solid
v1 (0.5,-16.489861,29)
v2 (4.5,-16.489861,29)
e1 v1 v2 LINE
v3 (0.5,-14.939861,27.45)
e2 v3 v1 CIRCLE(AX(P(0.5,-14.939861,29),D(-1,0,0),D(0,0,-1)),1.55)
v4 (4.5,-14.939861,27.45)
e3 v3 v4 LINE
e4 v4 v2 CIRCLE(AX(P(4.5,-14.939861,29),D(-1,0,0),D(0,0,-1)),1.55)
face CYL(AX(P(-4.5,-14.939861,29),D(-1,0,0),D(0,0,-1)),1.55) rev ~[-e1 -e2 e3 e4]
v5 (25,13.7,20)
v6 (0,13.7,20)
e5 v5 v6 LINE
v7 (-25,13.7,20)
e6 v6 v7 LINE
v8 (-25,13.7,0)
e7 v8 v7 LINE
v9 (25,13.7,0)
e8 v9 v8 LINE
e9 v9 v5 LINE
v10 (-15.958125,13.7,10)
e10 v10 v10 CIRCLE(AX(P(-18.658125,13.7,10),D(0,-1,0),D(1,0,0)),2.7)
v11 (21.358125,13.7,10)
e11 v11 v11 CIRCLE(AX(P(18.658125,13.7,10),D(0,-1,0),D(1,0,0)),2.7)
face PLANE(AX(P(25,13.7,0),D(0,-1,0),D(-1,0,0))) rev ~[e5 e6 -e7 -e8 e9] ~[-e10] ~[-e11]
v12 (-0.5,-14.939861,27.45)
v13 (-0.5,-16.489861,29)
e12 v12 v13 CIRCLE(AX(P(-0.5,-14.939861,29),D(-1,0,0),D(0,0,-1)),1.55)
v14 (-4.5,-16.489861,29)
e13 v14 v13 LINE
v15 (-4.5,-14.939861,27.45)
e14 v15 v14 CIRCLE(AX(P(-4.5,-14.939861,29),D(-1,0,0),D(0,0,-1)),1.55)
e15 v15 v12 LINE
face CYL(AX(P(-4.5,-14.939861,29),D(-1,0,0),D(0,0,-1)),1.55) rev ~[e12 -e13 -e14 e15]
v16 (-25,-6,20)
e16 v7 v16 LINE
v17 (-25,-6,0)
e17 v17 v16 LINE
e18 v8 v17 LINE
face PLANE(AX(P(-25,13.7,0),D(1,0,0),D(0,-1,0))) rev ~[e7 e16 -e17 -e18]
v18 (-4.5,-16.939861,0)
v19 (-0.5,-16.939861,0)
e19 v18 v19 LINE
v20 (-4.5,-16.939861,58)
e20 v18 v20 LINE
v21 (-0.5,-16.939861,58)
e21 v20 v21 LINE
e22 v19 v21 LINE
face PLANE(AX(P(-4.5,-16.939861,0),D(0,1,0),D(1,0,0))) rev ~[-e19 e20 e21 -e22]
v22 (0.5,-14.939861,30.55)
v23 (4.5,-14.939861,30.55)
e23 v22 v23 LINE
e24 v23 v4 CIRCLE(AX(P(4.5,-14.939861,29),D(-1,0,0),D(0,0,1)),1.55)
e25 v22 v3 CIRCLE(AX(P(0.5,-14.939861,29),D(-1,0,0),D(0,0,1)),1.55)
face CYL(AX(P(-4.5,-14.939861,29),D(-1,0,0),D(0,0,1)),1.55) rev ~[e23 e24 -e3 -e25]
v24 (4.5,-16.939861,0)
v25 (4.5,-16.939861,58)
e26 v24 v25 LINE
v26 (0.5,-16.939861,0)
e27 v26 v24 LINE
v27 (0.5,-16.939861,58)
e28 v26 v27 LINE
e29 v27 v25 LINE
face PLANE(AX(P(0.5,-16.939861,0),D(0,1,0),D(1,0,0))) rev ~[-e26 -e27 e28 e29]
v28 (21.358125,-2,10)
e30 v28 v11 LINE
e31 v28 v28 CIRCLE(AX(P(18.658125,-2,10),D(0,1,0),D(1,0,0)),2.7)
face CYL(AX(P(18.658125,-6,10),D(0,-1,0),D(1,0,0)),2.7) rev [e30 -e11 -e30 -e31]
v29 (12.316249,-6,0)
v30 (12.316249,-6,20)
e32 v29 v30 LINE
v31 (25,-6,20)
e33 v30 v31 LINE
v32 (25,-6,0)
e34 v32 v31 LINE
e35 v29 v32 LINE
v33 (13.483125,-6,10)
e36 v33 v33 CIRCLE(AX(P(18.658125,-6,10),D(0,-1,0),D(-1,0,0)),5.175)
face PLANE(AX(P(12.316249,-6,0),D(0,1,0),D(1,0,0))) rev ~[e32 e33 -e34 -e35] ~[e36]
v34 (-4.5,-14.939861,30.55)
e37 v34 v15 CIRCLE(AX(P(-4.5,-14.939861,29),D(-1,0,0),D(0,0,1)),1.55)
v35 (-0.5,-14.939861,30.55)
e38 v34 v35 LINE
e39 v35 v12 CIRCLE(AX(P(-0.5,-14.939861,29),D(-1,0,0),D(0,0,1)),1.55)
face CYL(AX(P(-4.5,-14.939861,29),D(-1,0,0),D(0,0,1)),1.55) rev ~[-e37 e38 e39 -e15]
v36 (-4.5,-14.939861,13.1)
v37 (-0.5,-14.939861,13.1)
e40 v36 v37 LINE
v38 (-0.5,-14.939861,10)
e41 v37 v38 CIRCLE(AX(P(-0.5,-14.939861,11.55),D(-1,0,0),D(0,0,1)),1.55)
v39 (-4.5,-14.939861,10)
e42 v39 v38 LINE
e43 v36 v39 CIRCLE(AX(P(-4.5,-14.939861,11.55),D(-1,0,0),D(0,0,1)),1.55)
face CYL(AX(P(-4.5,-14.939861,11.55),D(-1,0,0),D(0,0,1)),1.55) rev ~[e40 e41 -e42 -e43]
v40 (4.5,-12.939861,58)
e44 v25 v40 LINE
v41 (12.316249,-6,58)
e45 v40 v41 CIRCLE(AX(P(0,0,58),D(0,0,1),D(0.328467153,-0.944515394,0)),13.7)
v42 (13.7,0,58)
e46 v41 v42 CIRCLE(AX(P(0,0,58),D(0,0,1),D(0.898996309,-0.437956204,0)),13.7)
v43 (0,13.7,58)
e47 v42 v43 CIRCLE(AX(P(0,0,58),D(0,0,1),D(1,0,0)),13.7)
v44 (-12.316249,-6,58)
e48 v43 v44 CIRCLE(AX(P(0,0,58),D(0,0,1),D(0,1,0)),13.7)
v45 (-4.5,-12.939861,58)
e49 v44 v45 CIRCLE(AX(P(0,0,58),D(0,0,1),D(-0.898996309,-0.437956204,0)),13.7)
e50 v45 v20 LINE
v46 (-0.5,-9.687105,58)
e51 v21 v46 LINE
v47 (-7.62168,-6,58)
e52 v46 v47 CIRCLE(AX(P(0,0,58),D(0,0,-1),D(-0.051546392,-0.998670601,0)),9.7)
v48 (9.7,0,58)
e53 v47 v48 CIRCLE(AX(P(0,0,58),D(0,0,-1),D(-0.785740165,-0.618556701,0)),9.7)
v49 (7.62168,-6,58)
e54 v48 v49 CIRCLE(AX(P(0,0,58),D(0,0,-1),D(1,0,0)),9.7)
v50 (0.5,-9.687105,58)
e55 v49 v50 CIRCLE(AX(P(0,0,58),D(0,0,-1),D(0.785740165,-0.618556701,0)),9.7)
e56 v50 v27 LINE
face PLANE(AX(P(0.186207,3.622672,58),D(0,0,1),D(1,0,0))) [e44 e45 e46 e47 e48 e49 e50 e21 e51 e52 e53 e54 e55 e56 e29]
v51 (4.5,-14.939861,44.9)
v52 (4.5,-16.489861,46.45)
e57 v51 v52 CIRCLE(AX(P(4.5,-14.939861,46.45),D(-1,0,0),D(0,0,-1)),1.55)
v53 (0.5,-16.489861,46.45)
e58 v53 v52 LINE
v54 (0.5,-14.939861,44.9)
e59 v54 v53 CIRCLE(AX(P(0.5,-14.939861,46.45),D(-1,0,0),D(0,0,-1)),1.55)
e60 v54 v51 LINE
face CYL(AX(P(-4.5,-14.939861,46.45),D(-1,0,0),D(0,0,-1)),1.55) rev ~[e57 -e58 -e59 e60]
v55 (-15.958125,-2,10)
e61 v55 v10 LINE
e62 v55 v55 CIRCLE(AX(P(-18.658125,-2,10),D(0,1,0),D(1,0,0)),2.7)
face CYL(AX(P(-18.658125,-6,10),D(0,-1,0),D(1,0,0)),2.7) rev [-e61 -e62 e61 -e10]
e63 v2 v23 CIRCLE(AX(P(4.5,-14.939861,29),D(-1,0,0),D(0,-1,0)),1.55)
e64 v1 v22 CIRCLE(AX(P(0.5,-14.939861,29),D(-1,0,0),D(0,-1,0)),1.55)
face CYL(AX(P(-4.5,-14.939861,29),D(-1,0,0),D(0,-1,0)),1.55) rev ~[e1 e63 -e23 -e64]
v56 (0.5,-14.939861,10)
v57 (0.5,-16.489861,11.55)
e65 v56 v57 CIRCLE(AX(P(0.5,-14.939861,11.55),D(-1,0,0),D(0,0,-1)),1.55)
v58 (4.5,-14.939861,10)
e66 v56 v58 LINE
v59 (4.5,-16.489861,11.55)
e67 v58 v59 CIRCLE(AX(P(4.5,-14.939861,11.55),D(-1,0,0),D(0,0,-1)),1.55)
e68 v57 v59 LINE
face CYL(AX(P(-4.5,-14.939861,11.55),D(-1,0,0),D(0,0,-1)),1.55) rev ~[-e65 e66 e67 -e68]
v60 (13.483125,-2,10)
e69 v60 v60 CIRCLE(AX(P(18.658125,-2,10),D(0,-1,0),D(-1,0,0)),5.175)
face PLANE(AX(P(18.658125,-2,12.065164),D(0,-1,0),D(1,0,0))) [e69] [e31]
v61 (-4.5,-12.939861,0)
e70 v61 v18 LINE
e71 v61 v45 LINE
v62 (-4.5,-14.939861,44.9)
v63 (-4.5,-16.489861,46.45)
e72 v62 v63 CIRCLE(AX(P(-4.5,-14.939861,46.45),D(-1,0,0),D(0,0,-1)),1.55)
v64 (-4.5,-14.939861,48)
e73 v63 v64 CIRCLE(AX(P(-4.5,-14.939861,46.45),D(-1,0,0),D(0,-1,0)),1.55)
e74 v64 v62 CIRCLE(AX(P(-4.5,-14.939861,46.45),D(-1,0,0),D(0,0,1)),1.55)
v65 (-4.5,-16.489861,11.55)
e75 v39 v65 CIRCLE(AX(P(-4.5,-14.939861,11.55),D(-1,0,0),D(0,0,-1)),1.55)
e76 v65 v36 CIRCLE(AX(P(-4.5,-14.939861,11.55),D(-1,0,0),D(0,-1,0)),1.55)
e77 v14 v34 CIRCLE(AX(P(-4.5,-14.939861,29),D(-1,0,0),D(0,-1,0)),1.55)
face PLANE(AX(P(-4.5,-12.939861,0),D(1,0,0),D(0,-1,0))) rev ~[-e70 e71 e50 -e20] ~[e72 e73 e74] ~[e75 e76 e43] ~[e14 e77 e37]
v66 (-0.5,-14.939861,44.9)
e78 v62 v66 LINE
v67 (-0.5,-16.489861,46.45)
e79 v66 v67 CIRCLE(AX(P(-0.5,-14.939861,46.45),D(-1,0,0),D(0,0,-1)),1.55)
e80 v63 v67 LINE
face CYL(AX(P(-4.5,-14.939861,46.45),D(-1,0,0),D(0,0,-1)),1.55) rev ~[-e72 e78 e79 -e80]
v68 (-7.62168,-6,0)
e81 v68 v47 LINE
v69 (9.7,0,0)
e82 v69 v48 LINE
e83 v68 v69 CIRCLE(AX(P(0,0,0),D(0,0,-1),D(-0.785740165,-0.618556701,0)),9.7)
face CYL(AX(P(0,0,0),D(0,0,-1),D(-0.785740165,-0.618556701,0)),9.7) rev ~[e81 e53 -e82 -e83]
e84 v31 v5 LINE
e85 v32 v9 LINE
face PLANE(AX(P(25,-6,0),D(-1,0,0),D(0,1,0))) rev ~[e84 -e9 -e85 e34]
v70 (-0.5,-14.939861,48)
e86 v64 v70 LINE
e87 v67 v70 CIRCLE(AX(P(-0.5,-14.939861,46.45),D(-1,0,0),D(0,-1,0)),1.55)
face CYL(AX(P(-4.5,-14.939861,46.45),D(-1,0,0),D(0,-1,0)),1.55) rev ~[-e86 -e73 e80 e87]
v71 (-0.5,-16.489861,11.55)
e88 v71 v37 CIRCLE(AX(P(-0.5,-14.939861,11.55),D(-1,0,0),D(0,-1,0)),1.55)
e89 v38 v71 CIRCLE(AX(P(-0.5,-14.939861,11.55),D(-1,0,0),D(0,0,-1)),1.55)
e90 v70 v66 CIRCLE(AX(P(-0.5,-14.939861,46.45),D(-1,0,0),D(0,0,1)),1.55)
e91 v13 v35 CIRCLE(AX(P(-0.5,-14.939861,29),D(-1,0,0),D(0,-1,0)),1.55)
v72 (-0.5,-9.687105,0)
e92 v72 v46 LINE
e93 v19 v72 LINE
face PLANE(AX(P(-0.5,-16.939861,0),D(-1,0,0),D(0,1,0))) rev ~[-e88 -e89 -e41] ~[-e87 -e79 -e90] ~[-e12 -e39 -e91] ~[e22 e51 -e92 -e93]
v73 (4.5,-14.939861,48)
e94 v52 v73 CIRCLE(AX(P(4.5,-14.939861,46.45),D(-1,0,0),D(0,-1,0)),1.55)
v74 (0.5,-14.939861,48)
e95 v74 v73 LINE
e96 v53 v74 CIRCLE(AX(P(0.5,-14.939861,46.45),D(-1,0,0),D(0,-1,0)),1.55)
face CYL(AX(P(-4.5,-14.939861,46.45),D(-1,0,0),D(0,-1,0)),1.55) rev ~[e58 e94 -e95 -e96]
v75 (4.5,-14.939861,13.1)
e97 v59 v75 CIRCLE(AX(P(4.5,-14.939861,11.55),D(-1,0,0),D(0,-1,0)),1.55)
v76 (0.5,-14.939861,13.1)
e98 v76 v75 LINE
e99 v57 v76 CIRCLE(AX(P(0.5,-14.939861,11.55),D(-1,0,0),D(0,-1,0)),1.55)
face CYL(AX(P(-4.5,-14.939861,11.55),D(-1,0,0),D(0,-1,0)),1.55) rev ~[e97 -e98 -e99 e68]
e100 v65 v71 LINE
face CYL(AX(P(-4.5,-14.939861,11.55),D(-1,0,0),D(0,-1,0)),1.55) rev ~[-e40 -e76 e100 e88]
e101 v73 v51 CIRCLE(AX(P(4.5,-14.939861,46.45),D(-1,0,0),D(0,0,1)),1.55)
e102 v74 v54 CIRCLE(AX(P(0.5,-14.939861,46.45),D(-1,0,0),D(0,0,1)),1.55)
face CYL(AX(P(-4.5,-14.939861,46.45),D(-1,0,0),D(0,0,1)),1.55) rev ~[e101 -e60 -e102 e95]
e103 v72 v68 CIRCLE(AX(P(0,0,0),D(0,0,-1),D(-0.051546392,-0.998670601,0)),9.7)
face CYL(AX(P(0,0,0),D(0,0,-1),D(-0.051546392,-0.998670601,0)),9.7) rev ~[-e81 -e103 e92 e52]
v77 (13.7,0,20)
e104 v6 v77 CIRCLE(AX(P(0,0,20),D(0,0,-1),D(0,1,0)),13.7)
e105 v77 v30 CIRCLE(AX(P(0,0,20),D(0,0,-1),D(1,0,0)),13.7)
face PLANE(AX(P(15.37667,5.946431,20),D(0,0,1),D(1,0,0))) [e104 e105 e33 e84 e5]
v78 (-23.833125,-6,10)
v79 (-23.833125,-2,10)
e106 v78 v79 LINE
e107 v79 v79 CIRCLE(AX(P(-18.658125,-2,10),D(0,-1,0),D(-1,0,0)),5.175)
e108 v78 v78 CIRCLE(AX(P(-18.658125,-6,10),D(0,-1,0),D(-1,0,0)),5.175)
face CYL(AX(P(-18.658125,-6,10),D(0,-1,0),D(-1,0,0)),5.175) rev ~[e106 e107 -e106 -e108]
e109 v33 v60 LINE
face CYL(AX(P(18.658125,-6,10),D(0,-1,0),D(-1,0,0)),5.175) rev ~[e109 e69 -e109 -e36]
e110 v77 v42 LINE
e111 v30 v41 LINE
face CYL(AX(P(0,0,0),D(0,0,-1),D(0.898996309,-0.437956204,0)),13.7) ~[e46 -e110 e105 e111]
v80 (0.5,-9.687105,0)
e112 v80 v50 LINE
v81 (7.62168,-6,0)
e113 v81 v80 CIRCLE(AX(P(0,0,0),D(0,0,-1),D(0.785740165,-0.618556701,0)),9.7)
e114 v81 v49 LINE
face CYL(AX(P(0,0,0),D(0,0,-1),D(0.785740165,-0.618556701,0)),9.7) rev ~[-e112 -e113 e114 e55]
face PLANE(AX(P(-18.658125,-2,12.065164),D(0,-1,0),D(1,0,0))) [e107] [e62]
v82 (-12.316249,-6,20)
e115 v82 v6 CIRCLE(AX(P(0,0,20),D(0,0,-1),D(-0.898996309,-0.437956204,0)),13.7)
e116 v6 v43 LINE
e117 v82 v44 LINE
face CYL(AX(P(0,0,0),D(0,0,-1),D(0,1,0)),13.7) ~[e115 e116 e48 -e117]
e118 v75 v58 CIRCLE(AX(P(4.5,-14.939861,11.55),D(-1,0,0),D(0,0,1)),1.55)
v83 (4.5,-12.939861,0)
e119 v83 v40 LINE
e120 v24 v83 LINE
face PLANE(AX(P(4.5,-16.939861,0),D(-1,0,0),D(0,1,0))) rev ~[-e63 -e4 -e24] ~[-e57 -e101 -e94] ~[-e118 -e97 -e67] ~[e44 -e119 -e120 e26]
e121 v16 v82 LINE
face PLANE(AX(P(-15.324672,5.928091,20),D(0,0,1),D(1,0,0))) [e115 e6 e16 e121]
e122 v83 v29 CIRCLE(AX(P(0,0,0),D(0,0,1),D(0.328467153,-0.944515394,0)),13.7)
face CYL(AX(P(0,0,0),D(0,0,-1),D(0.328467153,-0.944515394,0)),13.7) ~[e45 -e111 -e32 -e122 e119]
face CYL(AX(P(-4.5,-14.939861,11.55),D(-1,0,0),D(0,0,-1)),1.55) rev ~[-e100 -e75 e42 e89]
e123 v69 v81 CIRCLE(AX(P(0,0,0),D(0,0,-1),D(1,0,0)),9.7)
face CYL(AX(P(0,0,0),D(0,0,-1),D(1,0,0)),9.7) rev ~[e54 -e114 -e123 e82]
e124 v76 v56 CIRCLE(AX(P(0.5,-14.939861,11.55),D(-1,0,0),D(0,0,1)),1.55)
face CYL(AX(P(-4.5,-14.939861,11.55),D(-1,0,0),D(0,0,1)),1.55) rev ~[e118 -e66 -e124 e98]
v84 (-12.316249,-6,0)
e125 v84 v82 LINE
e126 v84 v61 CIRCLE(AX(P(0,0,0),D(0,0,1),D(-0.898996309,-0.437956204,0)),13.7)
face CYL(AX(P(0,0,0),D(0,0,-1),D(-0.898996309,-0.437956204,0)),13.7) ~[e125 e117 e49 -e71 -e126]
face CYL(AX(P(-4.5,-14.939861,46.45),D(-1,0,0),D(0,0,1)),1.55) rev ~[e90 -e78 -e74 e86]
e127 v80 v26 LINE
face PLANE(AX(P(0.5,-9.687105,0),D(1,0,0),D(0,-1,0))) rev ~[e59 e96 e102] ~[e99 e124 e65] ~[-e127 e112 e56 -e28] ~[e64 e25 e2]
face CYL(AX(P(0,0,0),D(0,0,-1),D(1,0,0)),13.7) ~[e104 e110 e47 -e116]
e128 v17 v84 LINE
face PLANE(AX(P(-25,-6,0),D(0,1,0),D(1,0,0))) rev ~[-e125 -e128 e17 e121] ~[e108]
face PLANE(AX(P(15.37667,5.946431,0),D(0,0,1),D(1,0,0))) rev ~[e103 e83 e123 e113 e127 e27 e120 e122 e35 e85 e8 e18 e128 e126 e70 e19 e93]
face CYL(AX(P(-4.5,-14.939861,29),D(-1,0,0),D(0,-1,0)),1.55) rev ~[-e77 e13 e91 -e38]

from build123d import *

# Parameters (mm, degrees)
F1_DEPTH = 20
F0_W     = 4
F0_H     = 2.9398608957
F2_DEPTH = 58
F4_DEPTH = 4
F5_DEPTH = 20
F7_DEPTH = 9


# Not quite as in the source:
# - a feature names something its author has since deleted; it is built from what else it names


with BuildPart() as f1:
    # F0 (on Top) → F1 (new body)
    with BuildSketch(Plane.XY):
        with BuildLine():
            Line((0, 13.7), (-25, 13.7))
            Line((-25, 13.7), (-25, -6))
            Line((-25, -6), (-12.3162494291, -6))
            ThreePointArc((-12.3162494291, -6), (-11.6165829744, 7.2625753008), (0, 13.7))
        make_face()
    extrude(amount=F1_DEPTH)



with BuildPart() as f1b:
    # F0 (on Top) → F1, piece 2 (new body)
    with BuildSketch(Plane.XY):
        with BuildLine():
            Line((25, 13.7), (0, 13.7))
            ThreePointArc((0, 13.7), (9.6873629023, 9.6873629023), (13.7, 0))
            ThreePointArc((13.7, 0), (13.3495808395, -3.0787483513), (12.3162494291, -6))
            Line((12.3162494291, -6), (25, -6))
            Line((25, -6), (25, 13.7))
        make_face()
    extrude(amount=F1_DEPTH)


with BuildPart() as f1_1:
    add(f1.part)

    add(f1b.part)  # F2 merges F1b
    # F0 (on Top) → F2 (join)
    with BuildSketch(Plane.XY):
        with BuildLine():
            ThreePointArc((13.7, 0), (9.6873629023, 9.6873629023), (0, 13.7))
            ThreePointArc((0, 13.7), (-11.6165829744, 7.2625753008), (-12.3162494291, -6))
            Line((-12.3162494291, -6), (-7.6216796049, -6))
            ThreePointArc((-7.6216796049, -6), (-3.1748785672, 9.1657048875), (9.7, 0))
            ThreePointArc((9.7, 0), (9.1657048875, -3.1748785672), (7.6216796049, -6))
            Line((7.6216796049, -6), (12.3162494291, -6))
            ThreePointArc((12.3162494291, -6), (13.3495808395, -3.0787483513), (13.7, 0))
        make_face()
        with BuildLine():
            Line((-7.6216796049, -6), (-12.3162494291, -6))
            ThreePointArc((-12.3162494291, -6), (-9.0959869464, -10.244658192), (-4.5, -12.9398608957))
            ThreePointArc((-4.5, -12.9398608957), (-2.5280436601, -13.4647315329), (-0.5, -13.6908728721))
            Line((-0.5, -13.6908728721), (-0.5, -9.6871048306))
            ThreePointArc((-0.5, -9.6871048306), (-4.4597203286, -8.6139941137), (-7.6216796049, -6))
        make_face()
        with BuildLine():
            ThreePointArc((4.5, -12.9398608957), (9.0959869464, -10.244658192), (12.3162494291, -6))
            Line((12.3162494291, -6), (7.6216796049, -6))
            ThreePointArc((7.6216796049, -6), (4.4597203286, -8.6139941137), (0.5, -9.6871048306))
            Line((0.5, -9.6871048306), (0.5, -13.6908728721))
            ThreePointArc((0.5, -13.6908728721), (2.5280436601, -13.4647315329), (4.5, -12.9398608957))
        make_face()
        with Locations((2.5, -15.4699304478)):
            Rectangle(F0_W, F0_H)
        with BuildLine():
            Line((4.5, -14), (4.5, -12.9398608957))
            ThreePointArc((4.5, -12.9398608957), (2.5280436601, -13.4647315329), (0.5, -13.6908728721))
            Line((0.5, -13.6908728721), (0.5, -14))
            Line((0.5, -14), (4.5, -14))
        make_face()
        with BuildLine():
            ThreePointArc((-0.5, -13.6908728721), (-2.5280436601, -13.4647315329), (-4.5, -12.9398608957))
            Line((-4.5, -12.9398608957), (-4.5, -14))
            Line((-4.5, -14), (-0.5, -14))
            Line((-0.5, -14), (-0.5, -13.6908728721))
        make_face()
        with Locations((-2.5, -15.4699304478)):
            Rectangle(F0_W, F0_H)
    extrude(amount=F2_DEPTH)

    # F3 (on face) → F4 (cut)
    with BuildSketch(Plane.XZ.offset(6)):
        with BuildLine():
            ThreePointArc((-21.3581247146, 10), (-18.6581247146, 12.7), (-15.9581247146, 10))
            Line((-15.9581247146, 10), (-13.4831247146, 10))
            ThreePointArc((-13.4831247146, 10), (-18.6581247146, 15.175), (-23.8331247146, 10))
            Line((-23.8331247146, 10), (-21.3581247146, 10))
        make_face()
        with BuildLine():
            Line((-13.4831247146, 10), (-15.9581247146, 10))
            ThreePointArc((-15.9581247146, 10), (-18.6581247146, 7.3), (-21.3581247146, 10))
            Line((-21.3581247146, 10), (-23.8331247146, 10))
            ThreePointArc((-23.8331247146, 10), (-18.6581247146, 4.825), (-13.4831247146, 10))
        make_face()
        with BuildLine():
            ThreePointArc((23.8331247146, 10), (18.6581247146, 15.175), (13.4831247146, 10))
            Line((13.4831247146, 10), (15.9581247146, 10))
            ThreePointArc((15.9581247146, 10), (18.6581247146, 12.7), (21.3581247146, 10))
            Line((21.3581247146, 10), (23.8331247146, 10))
        make_face()
        with BuildLine():
            Line((15.9581247146, 10), (13.4831247146, 10))
            ThreePointArc((13.4831247146, 10), (18.6581247146, 4.825), (23.8331247146, 10))
            Line((23.8331247146, 10), (21.3581247146, 10))
            ThreePointArc((21.3581247146, 10), (18.6581247146, 7.3), (15.9581247146, 10))
        make_face()
    extrude(amount=-F4_DEPTH, mode=Mode.SUBTRACT)

    # F5 (cut): faces of the model
    f5_faces = [f1_1.faces().sort_by_distance(p)[0] for p in [
        (-18.6581247146, -6, 10),
        (18.6581247146, -6, 10),
    ]]
    extrude(f5_faces, amount=-F5_DEPTH, mode=Mode.SUBTRACT)

    # F6 (on face) → F7 (cut)
    with BuildSketch(Plane(origin=(-4.5, 0, 0), x_dir=(0, -1, 0), z_dir=(-1, 0, 0))):
        with BuildLine():
            ThreePointArc((16.4898608957, 46.45), (16.0358764065, 47.5460155108), (14.9398608957, 48))
            Line((14.9398608957, 48), (14.9398608957, 44.9))
            ThreePointArc((14.9398608957, 44.9), (16.0358764065, 45.3539844892), (16.4898608957, 46.45))
        make_face()
        with BuildLine():
            ThreePointArc((16.4898608957, 11.55), (16.0358764065, 12.6460155108), (14.9398608957, 13.1))
            Line((14.9398608957, 13.1), (14.9398608957, 10))
            ThreePointArc((14.9398608957, 10), (16.0358764065, 10.4539844892), (16.4898608957, 11.55))
        make_face()
        with BuildLine():
            Line((14.9398608957, 10), (14.9398608957, 13.1))
            ThreePointArc((14.9398608957, 13.1), (13.3898608957, 11.55), (14.9398608957, 10))
        make_face()
        with BuildLine():
            ThreePointArc((16.4898608957, 29), (16.0358764065, 30.0960155108), (14.9398608957, 30.55))
            Line((14.9398608957, 30.55), (14.9398608957, 29))
            Line((14.9398608957, 29), (16.4898608957, 29))
        make_face()
        with BuildLine():
            Line((14.9398608957, 29), (14.9398608957, 30.55))
            ThreePointArc((14.9398608957, 30.55), (13.3898608957, 29), (14.9398608957, 27.45))
            Line((14.9398608957, 27.45), (14.9398608957, 29))
        make_face()
        with BuildLine():
            Line((14.9398608957, 44.9), (14.9398608957, 48))
            ThreePointArc((14.9398608957, 48), (13.3898608957, 46.45), (14.9398608957, 44.9))
        make_face()
        with BuildLine():
            Line((16.4898608957, 29), (14.9398608957, 29))
            Line((14.9398608957, 29), (14.9398608957, 27.45))
            ThreePointArc((14.9398608957, 27.45), (16.0358764065, 27.9039844892), (16.4898608957, 29))
        make_face()
    extrude(amount=-F7_DEPTH, mode=Mode.SUBTRACT)


solid = f1_1.part
